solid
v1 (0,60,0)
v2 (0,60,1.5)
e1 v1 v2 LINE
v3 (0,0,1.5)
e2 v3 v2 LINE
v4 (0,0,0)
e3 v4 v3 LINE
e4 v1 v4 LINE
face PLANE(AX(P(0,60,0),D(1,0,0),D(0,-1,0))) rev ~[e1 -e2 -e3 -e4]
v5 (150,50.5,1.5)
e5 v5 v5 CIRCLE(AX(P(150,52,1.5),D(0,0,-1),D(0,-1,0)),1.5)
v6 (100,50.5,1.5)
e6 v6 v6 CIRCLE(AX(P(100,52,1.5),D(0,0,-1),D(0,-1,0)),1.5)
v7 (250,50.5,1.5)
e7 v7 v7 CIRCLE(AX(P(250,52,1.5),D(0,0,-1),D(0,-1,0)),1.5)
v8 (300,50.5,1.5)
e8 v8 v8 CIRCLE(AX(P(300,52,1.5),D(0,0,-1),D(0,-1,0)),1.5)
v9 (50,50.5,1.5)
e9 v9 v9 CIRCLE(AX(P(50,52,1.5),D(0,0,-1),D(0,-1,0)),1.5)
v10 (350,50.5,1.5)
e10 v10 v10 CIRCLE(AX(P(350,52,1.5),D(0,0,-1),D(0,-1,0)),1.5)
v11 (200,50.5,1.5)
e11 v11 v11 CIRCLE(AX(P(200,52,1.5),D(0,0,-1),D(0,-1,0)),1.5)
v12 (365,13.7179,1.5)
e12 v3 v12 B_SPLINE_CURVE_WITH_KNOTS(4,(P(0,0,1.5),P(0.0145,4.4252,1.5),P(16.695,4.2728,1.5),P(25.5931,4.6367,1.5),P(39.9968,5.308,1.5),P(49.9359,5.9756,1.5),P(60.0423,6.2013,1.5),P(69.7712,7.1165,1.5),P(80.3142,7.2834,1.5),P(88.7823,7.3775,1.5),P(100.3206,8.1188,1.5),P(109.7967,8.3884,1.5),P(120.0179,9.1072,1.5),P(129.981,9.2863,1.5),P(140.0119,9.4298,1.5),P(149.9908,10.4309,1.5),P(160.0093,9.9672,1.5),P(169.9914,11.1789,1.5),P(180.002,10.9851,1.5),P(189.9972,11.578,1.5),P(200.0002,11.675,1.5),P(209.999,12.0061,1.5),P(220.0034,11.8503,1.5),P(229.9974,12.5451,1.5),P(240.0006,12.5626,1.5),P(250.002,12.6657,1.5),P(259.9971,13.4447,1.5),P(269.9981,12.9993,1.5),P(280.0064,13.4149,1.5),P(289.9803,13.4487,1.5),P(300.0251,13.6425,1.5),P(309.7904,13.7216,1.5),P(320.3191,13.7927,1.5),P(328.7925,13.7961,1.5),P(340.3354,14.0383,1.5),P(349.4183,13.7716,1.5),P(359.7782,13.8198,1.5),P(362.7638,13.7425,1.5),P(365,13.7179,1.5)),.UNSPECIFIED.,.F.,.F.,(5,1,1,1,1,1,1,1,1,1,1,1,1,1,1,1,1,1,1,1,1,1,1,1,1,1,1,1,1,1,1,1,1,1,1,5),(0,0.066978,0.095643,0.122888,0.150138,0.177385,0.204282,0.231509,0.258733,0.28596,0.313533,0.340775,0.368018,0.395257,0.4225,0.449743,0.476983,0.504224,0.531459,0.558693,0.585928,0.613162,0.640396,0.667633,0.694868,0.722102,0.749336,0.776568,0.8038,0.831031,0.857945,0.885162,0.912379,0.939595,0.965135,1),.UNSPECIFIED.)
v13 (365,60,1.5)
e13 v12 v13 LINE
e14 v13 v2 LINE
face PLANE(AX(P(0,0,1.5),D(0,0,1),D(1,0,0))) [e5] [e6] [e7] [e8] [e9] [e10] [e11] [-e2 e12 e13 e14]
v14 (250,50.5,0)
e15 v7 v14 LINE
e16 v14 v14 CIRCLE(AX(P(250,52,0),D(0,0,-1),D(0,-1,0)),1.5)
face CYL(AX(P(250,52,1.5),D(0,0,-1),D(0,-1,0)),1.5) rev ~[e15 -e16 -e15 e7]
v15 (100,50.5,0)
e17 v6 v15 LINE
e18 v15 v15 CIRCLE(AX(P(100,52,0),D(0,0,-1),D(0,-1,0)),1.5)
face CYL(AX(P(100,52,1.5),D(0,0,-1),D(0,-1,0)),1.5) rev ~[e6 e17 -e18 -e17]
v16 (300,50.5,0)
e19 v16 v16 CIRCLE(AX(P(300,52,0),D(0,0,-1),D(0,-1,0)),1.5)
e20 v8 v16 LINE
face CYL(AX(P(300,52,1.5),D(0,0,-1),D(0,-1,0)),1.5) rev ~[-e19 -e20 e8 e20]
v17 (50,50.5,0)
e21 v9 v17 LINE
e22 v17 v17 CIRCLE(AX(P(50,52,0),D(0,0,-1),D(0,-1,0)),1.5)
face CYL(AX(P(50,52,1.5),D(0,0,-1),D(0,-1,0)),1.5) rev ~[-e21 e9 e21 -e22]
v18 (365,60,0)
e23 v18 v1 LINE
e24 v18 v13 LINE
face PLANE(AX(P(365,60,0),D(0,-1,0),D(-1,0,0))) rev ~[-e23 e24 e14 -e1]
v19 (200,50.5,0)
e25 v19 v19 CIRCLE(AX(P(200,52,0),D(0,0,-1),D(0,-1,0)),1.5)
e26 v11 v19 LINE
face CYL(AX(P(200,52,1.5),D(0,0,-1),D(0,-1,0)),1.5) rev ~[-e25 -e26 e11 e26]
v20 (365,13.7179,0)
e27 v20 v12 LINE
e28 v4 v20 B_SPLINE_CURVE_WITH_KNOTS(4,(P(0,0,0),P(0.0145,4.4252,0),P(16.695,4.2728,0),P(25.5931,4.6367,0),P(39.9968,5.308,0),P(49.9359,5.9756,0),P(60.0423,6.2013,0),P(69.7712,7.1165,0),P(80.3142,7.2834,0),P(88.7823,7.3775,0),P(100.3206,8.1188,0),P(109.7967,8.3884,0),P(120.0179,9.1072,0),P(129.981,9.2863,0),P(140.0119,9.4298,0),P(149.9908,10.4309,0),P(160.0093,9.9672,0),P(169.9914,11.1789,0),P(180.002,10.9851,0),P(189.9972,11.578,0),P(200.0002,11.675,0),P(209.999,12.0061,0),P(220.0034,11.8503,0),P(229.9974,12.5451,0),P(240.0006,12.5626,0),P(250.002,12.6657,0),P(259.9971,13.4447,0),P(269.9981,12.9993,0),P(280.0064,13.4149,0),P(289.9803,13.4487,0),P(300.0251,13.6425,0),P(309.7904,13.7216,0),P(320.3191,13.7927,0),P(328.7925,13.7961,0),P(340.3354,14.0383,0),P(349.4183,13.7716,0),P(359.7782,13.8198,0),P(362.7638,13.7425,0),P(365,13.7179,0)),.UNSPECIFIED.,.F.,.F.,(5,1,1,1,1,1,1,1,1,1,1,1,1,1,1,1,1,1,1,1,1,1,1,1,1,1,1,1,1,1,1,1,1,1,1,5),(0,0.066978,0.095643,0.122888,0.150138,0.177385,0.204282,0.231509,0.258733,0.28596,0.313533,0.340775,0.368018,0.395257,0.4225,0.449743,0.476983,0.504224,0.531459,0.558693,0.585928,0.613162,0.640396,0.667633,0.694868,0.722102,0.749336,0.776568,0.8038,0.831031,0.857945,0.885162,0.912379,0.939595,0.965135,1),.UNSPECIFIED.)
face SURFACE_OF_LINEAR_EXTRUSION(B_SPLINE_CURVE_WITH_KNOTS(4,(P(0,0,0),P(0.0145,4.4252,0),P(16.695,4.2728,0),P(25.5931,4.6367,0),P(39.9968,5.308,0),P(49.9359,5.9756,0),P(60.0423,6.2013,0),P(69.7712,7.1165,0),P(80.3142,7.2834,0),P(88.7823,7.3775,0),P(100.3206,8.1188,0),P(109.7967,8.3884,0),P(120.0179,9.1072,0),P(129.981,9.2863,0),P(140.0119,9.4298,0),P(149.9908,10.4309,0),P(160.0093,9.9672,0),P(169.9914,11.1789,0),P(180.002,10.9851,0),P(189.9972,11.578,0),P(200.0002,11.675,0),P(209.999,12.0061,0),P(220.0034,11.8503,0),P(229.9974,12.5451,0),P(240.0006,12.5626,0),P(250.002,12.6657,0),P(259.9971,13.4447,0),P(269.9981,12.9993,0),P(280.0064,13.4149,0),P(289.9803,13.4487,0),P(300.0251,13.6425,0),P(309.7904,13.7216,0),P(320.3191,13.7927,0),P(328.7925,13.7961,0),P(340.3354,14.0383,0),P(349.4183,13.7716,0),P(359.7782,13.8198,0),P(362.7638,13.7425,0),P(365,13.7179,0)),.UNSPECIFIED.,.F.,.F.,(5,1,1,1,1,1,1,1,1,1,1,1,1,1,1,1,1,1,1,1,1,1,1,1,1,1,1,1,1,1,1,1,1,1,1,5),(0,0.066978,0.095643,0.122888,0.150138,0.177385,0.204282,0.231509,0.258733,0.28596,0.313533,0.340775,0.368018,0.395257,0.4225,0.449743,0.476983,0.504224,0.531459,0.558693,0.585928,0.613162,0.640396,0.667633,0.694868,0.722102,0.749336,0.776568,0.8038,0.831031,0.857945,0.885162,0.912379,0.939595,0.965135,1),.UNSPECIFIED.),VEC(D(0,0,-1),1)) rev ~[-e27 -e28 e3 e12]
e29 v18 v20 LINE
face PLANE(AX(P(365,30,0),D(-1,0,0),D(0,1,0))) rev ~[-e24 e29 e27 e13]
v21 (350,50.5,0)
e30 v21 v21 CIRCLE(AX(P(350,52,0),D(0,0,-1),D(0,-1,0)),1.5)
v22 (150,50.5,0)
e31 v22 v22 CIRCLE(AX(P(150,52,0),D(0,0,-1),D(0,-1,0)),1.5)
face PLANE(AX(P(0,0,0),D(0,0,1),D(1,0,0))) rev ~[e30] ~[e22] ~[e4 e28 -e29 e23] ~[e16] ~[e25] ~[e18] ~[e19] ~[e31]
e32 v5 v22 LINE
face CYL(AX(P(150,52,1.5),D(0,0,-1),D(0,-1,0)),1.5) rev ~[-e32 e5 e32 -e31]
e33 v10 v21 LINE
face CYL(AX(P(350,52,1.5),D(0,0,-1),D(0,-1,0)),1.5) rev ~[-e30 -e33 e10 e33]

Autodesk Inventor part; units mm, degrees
ref_plane "YZ Plane" through (0, 0, 0) normal (1, 0, 0) x (0, 1, 0)
ref_plane "XZ Plane" through (0, 0, 0) normal (0, 1, 0) x (-1, 0, 0)
ref_plane "XY Plane" through (0, 0, 0) normal (0, 0, 1) x (1, 0, 0)
sketch "Sketch1" plane through (0, 0, 0) normal (0, 0, 1) x (1, 0, 0)
  line L0 (5.4169, -0.155) -> (5.4169, 3.485) construction
  line L1 (20, 0) -> (20, 4.5) construction
  line L2 (30, 0) -> (30, 4.85) construction
  line L3 (40, 0) -> (40, 5.35) construction
  line L4 (50, 0) -> (50, 5.89) construction
  line L5 (60, 0) -> (60, 6.34) construction
  line L6 (70, 0) -> (70, 6.97) construction
  line L7 (80, 0) -> (80, 7.27) construction
  line L8 (89.0098, -0.188) -> (89.0098, 7.492) construction
  line L9 (100, 0) -> (100, 8.03) construction
  line L10 (110, 0) -> (110, 8.48) construction
  line L11 (120, 0) -> (120, 9) construction
  line L12 (130, 0) -> (130, 9.28) construction
  line L13 (140, 0) -> (140, 9.6) construction
  line L14 (150, 0) -> (150, 10.14) construction
  line L15 (160, 0) -> (160, 10.3) construction
  line L16 (170, 0) -> (170, 10.9) construction
  line L17 (180, 0) -> (180, 11.14) construction
  line L18 (190, 0) -> (190, 11.48) construction
  line L19 (200, 0) -> (200, 11.72) construction
  line L20 (210, 0) -> (210, 11.91) construction
  line L21 (220, 0) -> (220, 12.02) construction
  line L22 (230, 0) -> (230, 12.41) construction
  line L23 (240, 0) -> (240, 12.58) construction
  line L24 (250, 0) -> (250, 12.8) construction
  line L25 (260, 0) -> (260, 13.2) construction
  line L26 (270, 0) -> (270, 13.17) construction
  line L27 (280, 0) -> (280, 13.34) construction
  line L28 (290, 0) -> (290, 13.48) construction
  line L29 (300, 0) -> (300, 13.62) construction
  line L30 (310, 0) -> (310, 13.72) construction
  line L31 (320, 0) -> (320, 13.78) construction
  line L32 (329.0907, 0) -> (329.0907, 13.84) construction
  line L33 (340, 0) -> (340, 13.94) construction
  line L34 (350, 0) -> (350, 13.84) construction
  line L35 (360, 0) -> (360, 13.78) construction
  line L36 (369.2114, -0.0184) -> (369.2114, 13.6816) construction
  line L37 (380, 0) -> (380, 13.65) construction
  line L38 (390, 0) -> (390, 13.6) construction
  line L39 (400, 0) -> (401, 0) construction
  line L40 (400, 0) -> (400, 13.55) construction
  line L41 (410, 0) -> (410, 13.5) construction
  line L42 (420, 0) -> (420, 13.45) construction
  line L43 (430, 0) -> (430, 13.4) construction
  line L44 (440, 0) -> (440, 13.3) construction
  line L45 (449.0907, 0.4814) -> (449.0907, 13.6014) construction
  line L46 (459.0907, 0.4814) -> (459.0907, 13.3914) construction
  line L47 (469.0907, 0.4814) -> (469.0907, 13.2414) construction
  line L48 (480, 0) -> (480, 12.68) construction
  line L49 (490, 0) -> (490, 12.44) construction
  line L50 (500, 0) -> (500, 12.3) construction
  line L51 (509.0907, -0.2033) -> (509.0907, 12.0967) construction
  line L52 (520, 0) -> (520, 11.72) construction
  line L53 (530, 0) -> (530, 11.57) construction
  line L54 (540, 0) -> (540, 11.42) construction
  line L55 (550, 0) -> (550, 11.11) construction
  line L56 (560, 0) -> (560, 10.82) construction
  line L57 (570, 0) -> (570, 10.59) construction
  line L58 (580, 0) -> (580, 10.1) construction
  line L59 (590, 0) -> (590, 9.83) construction
  line L60 (600, 0) -> (600, 9.58) construction
  line L61 (610, 0) -> (610, 8.82) construction
  line L62 (620, 0) -> (620, 8.44) construction
  line L63 (630, 0) -> (630, 8.19) construction
  line L64 (640, 0) -> (640, 7.4) construction
  line L65 (650, 0) -> (650, 7.17) construction
  line L66 (660, 0) -> (660, 6.6) construction
  line L67 (670, 0) -> (670, 5.98) construction
  line L68 (680, 0) -> (680, 5.6) construction
  line L69 (690, 0) -> (690, 4.88) construction
  line L70 (700, 0) -> (700, 4.66) construction
  line L71 (710, 0) -> (710, 4.2) construction
  line L72 (723.6522, 0) -> (723.6522, 3.65) construction
  spline S0 degree 4 poles (365, 13.7179) (367.2861, 13.6927) (372.0134, 13.6545) (380.3551, 13.6692) (389.8057, 13.5915) (400.0956, 13.558) (410.0033, 13.4823) (421.3768, 13.4934) (429.3322, 13.2433) (449.7646, 13.8639) (457.9068, 13.2204) (468.9537, 13.4987) (480.036, 12.5023) (489.6496, 12.4681) (500.2854, 12.2919) (508.8725, 12.1726) (520.2953, 11.6164) (529.8107, 11.5877) (540.0222, 11.4708) (549.9829, 11.1082) (560.0057, 10.7542) (570.0019, 10.7332) (579.9984, 9.9959) (589.9997, 9.777) (600.0116, 9.8283) (609.9915, 8.641) (619.9979, 8.3459) (630.0125, 8.5241) (639.9877, 7.0259) (650.0051, 7.4074) (660.0056, 6.5957) (669.9819, 5.8092) (680.0431, 5.8817) (689.9966, 4.5194) (704.3323, 5.0971) (713.673, 3.1501) (728.99, 5.1632) (730, 0) knots 0 0 0 0 0 0.02684 0.054659 0.082757 0.110587 0.138416 0.168902 0.199388 0.229874 0.260674 0.28882 0.316965 0.344787 0.372606 0.400425 0.428244 0.456387 0.48422 0.512054 0.539892 0.567729 0.595565 0.623411 0.651255 0.679099 0.706953 0.734798 0.762646 0.790499 0.818344 0.846197 0.874046 0.901891 0.930909 1 1 1 1 1
  line L73 (730, 0) -> (730, -8)
  line L74 (0, -8) -> (0, 0)
  line L75 (730, 0) -> (730, 30)
  line L76 (0, 30) -> (0, 0)
  line L77 (365, 30) -> (365, 13.7179)
  spline S1 degree 4 poles (0, 0) (0.0145, 4.4252) (16.695, 4.2728) (25.5931, 4.6367) (39.9968, 5.308) (49.9359, 5.9756) (60.0423, 6.2013) (69.7712, 7.1165) (80.3142, 7.2834) (88.7823, 7.3775) (100.3206, 8.1188) (109.7967, 8.3884) (120.0179, 9.1072) (129.981, 9.2863) (140.0119, 9.4298) (149.9908, 10.4309) (160.0093, 9.9672) (169.9914, 11.1789) (180.002, 10.9851) (189.9972, 11.578) (200.0002, 11.675) (209.999, 12.0061) (220.0034, 11.8503) (229.9974, 12.5451) (240.0006, 12.5626) (250.002, 12.6657) (259.9971, 13.4447) (269.9981, 12.9993) (280.0064, 13.4149) (289.9803, 13.4487) (300.0251, 13.6425) (309.7904, 13.7216) (320.3191, 13.7927) (328.7925, 13.7961) (340.3354, 14.0383) (349.4183, 13.7716) (359.7782, 13.8198) (362.7638, 13.7425) (365, 13.7179) knots 0 0 0 0 0 0.066978 0.095643 0.122888 0.150138 0.177385 0.204282 0.231509 0.258733 0.28596 0.313533 0.340775 0.368018 0.395257 0.4225 0.449743 0.476983 0.504224 0.531459 0.558693 0.585928 0.613162 0.640396 0.667633 0.694868 0.722102 0.749336 0.776568 0.8038 0.831031 0.857945 0.885162 0.912379 0.939595 0.965135 1 1 1 1 1
  line L78 (291.4223, 14.5287) -> (438.5777, 12.907) construction
  arc A0 (306.255, 16.0656) -> (423.7824, 14.7704) centre (376.201, 1030.1036) ccw construction
  line L79 (291.4223, 14.5287) -> (438.5777, 12.907) construction
  arc A1 (307.6611, 20.7672) -> (422.4803, 19.5019) centre (367.8656, 273.7464) ccw construction
  line L80 (365, 13.7179) -> (365, 0)
  line L81 (365, 0) -> (365, 60)
  line L82 (365, 60) -> (0, 60)
  line L83 (0, 60) -> (0, 0)
  dimension "d0" = 730
  dimension "d1" = 3.64
  dimension "d2" = 4.5
  dimension "d3" = 4.85
  dimension "d4" = 5.35
  dimension "d5" = 5.89
  dimension "d6" = 6.34
  dimension "d7" = 6.97
  dimension "d8" = 7.27
  dimension "d9" = 7.68
  dimension "d10" = 8.03
  dimension "d11" = 8.48
  dimension "d12" = 9
  dimension "d13" = 9.28
  dimension "d14" = 9.6
  dimension "d15" = 10.14
  dimension "d16" = 10.3
  dimension "d17" = 10.9
  dimension "d18" = 11.14
  dimension "d19" = 11.48
  dimension "d20" = 11.72
  dimension "d21" = 11.91
  dimension "d22" = 12.02
  dimension "d23" = 12.41
  dimension "d24" = 12.58
  dimension "d25" = 12.8
  dimension "d26" = 13.2
  dimension "d27" = 13.17
  dimension "d28" = 13.34
  dimension "d29" = 13.48
  dimension "d30" = 13.62
  dimension "d31" = 13.72
  dimension "d32" = 13.78
  dimension "d34" = 13.84
  dimension "d35" = 13.94
  dimension "d36" = 13.84
  dimension "d37" = 13.78
  dimension "d38" = 13.7
  dimension "d39" = 13.65
  dimension "d40" = 13.6
  dimension "d41" = 13.55
  dimension "d42" = 13.5
  dimension "d43" = 13.45
  dimension "d44" = 13.4
  dimension "d45" = 13.3
  dimension "d47" = 13.12
  dimension "d48" = 12.91
  dimension "d49" = 12.76
  dimension "d50" = 12.68
  dimension "d51" = 12.44
  dimension "d52" = 12.3
  dimension "d53" = 12.3
  dimension "d54" = 11.72
  dimension "d55" = 11.57
  dimension "d56" = 11.42
  dimension "d57" = 11.11
  dimension "d58" = 10.82
  dimension "d59" = 10.59
  dimension "d60" = 10.1
  dimension "d61" = 9.83
  dimension "d62" = 9.58
  dimension "d63" = 8.82
  dimension "d64" = 8.44
  dimension "d65" = 8.19
extrude "Extrusion2" add sketch "Sketch1" along normal blind 1.5
hole "Hole1" at (50, 52, 1.5) direction (0, 0, -1) diameter 3 end through all
hole "Hole2" at (100, 52, 1.5) direction (0, 0, -1) diameter 3 end through all
hole "Hole3" at (150, 52, 1.5) direction (0, 0, -1) diameter 3 end through all
hole "Hole4" at (200, 52, 1.5) direction (0, 0, -1) diameter 3 end through all
hole "Hole5" at (250, 52, 1.5) direction (0, 0, -1) diameter 3 end through all
hole "Hole6" at (300, 52, 1.5) direction (0, 0, -1) diameter 3 end through all
hole "Hole7" at (350, 52, 1.5) direction (0, 0, -1) diameter 3 end through all
properties part number "profil masca dreapta"
